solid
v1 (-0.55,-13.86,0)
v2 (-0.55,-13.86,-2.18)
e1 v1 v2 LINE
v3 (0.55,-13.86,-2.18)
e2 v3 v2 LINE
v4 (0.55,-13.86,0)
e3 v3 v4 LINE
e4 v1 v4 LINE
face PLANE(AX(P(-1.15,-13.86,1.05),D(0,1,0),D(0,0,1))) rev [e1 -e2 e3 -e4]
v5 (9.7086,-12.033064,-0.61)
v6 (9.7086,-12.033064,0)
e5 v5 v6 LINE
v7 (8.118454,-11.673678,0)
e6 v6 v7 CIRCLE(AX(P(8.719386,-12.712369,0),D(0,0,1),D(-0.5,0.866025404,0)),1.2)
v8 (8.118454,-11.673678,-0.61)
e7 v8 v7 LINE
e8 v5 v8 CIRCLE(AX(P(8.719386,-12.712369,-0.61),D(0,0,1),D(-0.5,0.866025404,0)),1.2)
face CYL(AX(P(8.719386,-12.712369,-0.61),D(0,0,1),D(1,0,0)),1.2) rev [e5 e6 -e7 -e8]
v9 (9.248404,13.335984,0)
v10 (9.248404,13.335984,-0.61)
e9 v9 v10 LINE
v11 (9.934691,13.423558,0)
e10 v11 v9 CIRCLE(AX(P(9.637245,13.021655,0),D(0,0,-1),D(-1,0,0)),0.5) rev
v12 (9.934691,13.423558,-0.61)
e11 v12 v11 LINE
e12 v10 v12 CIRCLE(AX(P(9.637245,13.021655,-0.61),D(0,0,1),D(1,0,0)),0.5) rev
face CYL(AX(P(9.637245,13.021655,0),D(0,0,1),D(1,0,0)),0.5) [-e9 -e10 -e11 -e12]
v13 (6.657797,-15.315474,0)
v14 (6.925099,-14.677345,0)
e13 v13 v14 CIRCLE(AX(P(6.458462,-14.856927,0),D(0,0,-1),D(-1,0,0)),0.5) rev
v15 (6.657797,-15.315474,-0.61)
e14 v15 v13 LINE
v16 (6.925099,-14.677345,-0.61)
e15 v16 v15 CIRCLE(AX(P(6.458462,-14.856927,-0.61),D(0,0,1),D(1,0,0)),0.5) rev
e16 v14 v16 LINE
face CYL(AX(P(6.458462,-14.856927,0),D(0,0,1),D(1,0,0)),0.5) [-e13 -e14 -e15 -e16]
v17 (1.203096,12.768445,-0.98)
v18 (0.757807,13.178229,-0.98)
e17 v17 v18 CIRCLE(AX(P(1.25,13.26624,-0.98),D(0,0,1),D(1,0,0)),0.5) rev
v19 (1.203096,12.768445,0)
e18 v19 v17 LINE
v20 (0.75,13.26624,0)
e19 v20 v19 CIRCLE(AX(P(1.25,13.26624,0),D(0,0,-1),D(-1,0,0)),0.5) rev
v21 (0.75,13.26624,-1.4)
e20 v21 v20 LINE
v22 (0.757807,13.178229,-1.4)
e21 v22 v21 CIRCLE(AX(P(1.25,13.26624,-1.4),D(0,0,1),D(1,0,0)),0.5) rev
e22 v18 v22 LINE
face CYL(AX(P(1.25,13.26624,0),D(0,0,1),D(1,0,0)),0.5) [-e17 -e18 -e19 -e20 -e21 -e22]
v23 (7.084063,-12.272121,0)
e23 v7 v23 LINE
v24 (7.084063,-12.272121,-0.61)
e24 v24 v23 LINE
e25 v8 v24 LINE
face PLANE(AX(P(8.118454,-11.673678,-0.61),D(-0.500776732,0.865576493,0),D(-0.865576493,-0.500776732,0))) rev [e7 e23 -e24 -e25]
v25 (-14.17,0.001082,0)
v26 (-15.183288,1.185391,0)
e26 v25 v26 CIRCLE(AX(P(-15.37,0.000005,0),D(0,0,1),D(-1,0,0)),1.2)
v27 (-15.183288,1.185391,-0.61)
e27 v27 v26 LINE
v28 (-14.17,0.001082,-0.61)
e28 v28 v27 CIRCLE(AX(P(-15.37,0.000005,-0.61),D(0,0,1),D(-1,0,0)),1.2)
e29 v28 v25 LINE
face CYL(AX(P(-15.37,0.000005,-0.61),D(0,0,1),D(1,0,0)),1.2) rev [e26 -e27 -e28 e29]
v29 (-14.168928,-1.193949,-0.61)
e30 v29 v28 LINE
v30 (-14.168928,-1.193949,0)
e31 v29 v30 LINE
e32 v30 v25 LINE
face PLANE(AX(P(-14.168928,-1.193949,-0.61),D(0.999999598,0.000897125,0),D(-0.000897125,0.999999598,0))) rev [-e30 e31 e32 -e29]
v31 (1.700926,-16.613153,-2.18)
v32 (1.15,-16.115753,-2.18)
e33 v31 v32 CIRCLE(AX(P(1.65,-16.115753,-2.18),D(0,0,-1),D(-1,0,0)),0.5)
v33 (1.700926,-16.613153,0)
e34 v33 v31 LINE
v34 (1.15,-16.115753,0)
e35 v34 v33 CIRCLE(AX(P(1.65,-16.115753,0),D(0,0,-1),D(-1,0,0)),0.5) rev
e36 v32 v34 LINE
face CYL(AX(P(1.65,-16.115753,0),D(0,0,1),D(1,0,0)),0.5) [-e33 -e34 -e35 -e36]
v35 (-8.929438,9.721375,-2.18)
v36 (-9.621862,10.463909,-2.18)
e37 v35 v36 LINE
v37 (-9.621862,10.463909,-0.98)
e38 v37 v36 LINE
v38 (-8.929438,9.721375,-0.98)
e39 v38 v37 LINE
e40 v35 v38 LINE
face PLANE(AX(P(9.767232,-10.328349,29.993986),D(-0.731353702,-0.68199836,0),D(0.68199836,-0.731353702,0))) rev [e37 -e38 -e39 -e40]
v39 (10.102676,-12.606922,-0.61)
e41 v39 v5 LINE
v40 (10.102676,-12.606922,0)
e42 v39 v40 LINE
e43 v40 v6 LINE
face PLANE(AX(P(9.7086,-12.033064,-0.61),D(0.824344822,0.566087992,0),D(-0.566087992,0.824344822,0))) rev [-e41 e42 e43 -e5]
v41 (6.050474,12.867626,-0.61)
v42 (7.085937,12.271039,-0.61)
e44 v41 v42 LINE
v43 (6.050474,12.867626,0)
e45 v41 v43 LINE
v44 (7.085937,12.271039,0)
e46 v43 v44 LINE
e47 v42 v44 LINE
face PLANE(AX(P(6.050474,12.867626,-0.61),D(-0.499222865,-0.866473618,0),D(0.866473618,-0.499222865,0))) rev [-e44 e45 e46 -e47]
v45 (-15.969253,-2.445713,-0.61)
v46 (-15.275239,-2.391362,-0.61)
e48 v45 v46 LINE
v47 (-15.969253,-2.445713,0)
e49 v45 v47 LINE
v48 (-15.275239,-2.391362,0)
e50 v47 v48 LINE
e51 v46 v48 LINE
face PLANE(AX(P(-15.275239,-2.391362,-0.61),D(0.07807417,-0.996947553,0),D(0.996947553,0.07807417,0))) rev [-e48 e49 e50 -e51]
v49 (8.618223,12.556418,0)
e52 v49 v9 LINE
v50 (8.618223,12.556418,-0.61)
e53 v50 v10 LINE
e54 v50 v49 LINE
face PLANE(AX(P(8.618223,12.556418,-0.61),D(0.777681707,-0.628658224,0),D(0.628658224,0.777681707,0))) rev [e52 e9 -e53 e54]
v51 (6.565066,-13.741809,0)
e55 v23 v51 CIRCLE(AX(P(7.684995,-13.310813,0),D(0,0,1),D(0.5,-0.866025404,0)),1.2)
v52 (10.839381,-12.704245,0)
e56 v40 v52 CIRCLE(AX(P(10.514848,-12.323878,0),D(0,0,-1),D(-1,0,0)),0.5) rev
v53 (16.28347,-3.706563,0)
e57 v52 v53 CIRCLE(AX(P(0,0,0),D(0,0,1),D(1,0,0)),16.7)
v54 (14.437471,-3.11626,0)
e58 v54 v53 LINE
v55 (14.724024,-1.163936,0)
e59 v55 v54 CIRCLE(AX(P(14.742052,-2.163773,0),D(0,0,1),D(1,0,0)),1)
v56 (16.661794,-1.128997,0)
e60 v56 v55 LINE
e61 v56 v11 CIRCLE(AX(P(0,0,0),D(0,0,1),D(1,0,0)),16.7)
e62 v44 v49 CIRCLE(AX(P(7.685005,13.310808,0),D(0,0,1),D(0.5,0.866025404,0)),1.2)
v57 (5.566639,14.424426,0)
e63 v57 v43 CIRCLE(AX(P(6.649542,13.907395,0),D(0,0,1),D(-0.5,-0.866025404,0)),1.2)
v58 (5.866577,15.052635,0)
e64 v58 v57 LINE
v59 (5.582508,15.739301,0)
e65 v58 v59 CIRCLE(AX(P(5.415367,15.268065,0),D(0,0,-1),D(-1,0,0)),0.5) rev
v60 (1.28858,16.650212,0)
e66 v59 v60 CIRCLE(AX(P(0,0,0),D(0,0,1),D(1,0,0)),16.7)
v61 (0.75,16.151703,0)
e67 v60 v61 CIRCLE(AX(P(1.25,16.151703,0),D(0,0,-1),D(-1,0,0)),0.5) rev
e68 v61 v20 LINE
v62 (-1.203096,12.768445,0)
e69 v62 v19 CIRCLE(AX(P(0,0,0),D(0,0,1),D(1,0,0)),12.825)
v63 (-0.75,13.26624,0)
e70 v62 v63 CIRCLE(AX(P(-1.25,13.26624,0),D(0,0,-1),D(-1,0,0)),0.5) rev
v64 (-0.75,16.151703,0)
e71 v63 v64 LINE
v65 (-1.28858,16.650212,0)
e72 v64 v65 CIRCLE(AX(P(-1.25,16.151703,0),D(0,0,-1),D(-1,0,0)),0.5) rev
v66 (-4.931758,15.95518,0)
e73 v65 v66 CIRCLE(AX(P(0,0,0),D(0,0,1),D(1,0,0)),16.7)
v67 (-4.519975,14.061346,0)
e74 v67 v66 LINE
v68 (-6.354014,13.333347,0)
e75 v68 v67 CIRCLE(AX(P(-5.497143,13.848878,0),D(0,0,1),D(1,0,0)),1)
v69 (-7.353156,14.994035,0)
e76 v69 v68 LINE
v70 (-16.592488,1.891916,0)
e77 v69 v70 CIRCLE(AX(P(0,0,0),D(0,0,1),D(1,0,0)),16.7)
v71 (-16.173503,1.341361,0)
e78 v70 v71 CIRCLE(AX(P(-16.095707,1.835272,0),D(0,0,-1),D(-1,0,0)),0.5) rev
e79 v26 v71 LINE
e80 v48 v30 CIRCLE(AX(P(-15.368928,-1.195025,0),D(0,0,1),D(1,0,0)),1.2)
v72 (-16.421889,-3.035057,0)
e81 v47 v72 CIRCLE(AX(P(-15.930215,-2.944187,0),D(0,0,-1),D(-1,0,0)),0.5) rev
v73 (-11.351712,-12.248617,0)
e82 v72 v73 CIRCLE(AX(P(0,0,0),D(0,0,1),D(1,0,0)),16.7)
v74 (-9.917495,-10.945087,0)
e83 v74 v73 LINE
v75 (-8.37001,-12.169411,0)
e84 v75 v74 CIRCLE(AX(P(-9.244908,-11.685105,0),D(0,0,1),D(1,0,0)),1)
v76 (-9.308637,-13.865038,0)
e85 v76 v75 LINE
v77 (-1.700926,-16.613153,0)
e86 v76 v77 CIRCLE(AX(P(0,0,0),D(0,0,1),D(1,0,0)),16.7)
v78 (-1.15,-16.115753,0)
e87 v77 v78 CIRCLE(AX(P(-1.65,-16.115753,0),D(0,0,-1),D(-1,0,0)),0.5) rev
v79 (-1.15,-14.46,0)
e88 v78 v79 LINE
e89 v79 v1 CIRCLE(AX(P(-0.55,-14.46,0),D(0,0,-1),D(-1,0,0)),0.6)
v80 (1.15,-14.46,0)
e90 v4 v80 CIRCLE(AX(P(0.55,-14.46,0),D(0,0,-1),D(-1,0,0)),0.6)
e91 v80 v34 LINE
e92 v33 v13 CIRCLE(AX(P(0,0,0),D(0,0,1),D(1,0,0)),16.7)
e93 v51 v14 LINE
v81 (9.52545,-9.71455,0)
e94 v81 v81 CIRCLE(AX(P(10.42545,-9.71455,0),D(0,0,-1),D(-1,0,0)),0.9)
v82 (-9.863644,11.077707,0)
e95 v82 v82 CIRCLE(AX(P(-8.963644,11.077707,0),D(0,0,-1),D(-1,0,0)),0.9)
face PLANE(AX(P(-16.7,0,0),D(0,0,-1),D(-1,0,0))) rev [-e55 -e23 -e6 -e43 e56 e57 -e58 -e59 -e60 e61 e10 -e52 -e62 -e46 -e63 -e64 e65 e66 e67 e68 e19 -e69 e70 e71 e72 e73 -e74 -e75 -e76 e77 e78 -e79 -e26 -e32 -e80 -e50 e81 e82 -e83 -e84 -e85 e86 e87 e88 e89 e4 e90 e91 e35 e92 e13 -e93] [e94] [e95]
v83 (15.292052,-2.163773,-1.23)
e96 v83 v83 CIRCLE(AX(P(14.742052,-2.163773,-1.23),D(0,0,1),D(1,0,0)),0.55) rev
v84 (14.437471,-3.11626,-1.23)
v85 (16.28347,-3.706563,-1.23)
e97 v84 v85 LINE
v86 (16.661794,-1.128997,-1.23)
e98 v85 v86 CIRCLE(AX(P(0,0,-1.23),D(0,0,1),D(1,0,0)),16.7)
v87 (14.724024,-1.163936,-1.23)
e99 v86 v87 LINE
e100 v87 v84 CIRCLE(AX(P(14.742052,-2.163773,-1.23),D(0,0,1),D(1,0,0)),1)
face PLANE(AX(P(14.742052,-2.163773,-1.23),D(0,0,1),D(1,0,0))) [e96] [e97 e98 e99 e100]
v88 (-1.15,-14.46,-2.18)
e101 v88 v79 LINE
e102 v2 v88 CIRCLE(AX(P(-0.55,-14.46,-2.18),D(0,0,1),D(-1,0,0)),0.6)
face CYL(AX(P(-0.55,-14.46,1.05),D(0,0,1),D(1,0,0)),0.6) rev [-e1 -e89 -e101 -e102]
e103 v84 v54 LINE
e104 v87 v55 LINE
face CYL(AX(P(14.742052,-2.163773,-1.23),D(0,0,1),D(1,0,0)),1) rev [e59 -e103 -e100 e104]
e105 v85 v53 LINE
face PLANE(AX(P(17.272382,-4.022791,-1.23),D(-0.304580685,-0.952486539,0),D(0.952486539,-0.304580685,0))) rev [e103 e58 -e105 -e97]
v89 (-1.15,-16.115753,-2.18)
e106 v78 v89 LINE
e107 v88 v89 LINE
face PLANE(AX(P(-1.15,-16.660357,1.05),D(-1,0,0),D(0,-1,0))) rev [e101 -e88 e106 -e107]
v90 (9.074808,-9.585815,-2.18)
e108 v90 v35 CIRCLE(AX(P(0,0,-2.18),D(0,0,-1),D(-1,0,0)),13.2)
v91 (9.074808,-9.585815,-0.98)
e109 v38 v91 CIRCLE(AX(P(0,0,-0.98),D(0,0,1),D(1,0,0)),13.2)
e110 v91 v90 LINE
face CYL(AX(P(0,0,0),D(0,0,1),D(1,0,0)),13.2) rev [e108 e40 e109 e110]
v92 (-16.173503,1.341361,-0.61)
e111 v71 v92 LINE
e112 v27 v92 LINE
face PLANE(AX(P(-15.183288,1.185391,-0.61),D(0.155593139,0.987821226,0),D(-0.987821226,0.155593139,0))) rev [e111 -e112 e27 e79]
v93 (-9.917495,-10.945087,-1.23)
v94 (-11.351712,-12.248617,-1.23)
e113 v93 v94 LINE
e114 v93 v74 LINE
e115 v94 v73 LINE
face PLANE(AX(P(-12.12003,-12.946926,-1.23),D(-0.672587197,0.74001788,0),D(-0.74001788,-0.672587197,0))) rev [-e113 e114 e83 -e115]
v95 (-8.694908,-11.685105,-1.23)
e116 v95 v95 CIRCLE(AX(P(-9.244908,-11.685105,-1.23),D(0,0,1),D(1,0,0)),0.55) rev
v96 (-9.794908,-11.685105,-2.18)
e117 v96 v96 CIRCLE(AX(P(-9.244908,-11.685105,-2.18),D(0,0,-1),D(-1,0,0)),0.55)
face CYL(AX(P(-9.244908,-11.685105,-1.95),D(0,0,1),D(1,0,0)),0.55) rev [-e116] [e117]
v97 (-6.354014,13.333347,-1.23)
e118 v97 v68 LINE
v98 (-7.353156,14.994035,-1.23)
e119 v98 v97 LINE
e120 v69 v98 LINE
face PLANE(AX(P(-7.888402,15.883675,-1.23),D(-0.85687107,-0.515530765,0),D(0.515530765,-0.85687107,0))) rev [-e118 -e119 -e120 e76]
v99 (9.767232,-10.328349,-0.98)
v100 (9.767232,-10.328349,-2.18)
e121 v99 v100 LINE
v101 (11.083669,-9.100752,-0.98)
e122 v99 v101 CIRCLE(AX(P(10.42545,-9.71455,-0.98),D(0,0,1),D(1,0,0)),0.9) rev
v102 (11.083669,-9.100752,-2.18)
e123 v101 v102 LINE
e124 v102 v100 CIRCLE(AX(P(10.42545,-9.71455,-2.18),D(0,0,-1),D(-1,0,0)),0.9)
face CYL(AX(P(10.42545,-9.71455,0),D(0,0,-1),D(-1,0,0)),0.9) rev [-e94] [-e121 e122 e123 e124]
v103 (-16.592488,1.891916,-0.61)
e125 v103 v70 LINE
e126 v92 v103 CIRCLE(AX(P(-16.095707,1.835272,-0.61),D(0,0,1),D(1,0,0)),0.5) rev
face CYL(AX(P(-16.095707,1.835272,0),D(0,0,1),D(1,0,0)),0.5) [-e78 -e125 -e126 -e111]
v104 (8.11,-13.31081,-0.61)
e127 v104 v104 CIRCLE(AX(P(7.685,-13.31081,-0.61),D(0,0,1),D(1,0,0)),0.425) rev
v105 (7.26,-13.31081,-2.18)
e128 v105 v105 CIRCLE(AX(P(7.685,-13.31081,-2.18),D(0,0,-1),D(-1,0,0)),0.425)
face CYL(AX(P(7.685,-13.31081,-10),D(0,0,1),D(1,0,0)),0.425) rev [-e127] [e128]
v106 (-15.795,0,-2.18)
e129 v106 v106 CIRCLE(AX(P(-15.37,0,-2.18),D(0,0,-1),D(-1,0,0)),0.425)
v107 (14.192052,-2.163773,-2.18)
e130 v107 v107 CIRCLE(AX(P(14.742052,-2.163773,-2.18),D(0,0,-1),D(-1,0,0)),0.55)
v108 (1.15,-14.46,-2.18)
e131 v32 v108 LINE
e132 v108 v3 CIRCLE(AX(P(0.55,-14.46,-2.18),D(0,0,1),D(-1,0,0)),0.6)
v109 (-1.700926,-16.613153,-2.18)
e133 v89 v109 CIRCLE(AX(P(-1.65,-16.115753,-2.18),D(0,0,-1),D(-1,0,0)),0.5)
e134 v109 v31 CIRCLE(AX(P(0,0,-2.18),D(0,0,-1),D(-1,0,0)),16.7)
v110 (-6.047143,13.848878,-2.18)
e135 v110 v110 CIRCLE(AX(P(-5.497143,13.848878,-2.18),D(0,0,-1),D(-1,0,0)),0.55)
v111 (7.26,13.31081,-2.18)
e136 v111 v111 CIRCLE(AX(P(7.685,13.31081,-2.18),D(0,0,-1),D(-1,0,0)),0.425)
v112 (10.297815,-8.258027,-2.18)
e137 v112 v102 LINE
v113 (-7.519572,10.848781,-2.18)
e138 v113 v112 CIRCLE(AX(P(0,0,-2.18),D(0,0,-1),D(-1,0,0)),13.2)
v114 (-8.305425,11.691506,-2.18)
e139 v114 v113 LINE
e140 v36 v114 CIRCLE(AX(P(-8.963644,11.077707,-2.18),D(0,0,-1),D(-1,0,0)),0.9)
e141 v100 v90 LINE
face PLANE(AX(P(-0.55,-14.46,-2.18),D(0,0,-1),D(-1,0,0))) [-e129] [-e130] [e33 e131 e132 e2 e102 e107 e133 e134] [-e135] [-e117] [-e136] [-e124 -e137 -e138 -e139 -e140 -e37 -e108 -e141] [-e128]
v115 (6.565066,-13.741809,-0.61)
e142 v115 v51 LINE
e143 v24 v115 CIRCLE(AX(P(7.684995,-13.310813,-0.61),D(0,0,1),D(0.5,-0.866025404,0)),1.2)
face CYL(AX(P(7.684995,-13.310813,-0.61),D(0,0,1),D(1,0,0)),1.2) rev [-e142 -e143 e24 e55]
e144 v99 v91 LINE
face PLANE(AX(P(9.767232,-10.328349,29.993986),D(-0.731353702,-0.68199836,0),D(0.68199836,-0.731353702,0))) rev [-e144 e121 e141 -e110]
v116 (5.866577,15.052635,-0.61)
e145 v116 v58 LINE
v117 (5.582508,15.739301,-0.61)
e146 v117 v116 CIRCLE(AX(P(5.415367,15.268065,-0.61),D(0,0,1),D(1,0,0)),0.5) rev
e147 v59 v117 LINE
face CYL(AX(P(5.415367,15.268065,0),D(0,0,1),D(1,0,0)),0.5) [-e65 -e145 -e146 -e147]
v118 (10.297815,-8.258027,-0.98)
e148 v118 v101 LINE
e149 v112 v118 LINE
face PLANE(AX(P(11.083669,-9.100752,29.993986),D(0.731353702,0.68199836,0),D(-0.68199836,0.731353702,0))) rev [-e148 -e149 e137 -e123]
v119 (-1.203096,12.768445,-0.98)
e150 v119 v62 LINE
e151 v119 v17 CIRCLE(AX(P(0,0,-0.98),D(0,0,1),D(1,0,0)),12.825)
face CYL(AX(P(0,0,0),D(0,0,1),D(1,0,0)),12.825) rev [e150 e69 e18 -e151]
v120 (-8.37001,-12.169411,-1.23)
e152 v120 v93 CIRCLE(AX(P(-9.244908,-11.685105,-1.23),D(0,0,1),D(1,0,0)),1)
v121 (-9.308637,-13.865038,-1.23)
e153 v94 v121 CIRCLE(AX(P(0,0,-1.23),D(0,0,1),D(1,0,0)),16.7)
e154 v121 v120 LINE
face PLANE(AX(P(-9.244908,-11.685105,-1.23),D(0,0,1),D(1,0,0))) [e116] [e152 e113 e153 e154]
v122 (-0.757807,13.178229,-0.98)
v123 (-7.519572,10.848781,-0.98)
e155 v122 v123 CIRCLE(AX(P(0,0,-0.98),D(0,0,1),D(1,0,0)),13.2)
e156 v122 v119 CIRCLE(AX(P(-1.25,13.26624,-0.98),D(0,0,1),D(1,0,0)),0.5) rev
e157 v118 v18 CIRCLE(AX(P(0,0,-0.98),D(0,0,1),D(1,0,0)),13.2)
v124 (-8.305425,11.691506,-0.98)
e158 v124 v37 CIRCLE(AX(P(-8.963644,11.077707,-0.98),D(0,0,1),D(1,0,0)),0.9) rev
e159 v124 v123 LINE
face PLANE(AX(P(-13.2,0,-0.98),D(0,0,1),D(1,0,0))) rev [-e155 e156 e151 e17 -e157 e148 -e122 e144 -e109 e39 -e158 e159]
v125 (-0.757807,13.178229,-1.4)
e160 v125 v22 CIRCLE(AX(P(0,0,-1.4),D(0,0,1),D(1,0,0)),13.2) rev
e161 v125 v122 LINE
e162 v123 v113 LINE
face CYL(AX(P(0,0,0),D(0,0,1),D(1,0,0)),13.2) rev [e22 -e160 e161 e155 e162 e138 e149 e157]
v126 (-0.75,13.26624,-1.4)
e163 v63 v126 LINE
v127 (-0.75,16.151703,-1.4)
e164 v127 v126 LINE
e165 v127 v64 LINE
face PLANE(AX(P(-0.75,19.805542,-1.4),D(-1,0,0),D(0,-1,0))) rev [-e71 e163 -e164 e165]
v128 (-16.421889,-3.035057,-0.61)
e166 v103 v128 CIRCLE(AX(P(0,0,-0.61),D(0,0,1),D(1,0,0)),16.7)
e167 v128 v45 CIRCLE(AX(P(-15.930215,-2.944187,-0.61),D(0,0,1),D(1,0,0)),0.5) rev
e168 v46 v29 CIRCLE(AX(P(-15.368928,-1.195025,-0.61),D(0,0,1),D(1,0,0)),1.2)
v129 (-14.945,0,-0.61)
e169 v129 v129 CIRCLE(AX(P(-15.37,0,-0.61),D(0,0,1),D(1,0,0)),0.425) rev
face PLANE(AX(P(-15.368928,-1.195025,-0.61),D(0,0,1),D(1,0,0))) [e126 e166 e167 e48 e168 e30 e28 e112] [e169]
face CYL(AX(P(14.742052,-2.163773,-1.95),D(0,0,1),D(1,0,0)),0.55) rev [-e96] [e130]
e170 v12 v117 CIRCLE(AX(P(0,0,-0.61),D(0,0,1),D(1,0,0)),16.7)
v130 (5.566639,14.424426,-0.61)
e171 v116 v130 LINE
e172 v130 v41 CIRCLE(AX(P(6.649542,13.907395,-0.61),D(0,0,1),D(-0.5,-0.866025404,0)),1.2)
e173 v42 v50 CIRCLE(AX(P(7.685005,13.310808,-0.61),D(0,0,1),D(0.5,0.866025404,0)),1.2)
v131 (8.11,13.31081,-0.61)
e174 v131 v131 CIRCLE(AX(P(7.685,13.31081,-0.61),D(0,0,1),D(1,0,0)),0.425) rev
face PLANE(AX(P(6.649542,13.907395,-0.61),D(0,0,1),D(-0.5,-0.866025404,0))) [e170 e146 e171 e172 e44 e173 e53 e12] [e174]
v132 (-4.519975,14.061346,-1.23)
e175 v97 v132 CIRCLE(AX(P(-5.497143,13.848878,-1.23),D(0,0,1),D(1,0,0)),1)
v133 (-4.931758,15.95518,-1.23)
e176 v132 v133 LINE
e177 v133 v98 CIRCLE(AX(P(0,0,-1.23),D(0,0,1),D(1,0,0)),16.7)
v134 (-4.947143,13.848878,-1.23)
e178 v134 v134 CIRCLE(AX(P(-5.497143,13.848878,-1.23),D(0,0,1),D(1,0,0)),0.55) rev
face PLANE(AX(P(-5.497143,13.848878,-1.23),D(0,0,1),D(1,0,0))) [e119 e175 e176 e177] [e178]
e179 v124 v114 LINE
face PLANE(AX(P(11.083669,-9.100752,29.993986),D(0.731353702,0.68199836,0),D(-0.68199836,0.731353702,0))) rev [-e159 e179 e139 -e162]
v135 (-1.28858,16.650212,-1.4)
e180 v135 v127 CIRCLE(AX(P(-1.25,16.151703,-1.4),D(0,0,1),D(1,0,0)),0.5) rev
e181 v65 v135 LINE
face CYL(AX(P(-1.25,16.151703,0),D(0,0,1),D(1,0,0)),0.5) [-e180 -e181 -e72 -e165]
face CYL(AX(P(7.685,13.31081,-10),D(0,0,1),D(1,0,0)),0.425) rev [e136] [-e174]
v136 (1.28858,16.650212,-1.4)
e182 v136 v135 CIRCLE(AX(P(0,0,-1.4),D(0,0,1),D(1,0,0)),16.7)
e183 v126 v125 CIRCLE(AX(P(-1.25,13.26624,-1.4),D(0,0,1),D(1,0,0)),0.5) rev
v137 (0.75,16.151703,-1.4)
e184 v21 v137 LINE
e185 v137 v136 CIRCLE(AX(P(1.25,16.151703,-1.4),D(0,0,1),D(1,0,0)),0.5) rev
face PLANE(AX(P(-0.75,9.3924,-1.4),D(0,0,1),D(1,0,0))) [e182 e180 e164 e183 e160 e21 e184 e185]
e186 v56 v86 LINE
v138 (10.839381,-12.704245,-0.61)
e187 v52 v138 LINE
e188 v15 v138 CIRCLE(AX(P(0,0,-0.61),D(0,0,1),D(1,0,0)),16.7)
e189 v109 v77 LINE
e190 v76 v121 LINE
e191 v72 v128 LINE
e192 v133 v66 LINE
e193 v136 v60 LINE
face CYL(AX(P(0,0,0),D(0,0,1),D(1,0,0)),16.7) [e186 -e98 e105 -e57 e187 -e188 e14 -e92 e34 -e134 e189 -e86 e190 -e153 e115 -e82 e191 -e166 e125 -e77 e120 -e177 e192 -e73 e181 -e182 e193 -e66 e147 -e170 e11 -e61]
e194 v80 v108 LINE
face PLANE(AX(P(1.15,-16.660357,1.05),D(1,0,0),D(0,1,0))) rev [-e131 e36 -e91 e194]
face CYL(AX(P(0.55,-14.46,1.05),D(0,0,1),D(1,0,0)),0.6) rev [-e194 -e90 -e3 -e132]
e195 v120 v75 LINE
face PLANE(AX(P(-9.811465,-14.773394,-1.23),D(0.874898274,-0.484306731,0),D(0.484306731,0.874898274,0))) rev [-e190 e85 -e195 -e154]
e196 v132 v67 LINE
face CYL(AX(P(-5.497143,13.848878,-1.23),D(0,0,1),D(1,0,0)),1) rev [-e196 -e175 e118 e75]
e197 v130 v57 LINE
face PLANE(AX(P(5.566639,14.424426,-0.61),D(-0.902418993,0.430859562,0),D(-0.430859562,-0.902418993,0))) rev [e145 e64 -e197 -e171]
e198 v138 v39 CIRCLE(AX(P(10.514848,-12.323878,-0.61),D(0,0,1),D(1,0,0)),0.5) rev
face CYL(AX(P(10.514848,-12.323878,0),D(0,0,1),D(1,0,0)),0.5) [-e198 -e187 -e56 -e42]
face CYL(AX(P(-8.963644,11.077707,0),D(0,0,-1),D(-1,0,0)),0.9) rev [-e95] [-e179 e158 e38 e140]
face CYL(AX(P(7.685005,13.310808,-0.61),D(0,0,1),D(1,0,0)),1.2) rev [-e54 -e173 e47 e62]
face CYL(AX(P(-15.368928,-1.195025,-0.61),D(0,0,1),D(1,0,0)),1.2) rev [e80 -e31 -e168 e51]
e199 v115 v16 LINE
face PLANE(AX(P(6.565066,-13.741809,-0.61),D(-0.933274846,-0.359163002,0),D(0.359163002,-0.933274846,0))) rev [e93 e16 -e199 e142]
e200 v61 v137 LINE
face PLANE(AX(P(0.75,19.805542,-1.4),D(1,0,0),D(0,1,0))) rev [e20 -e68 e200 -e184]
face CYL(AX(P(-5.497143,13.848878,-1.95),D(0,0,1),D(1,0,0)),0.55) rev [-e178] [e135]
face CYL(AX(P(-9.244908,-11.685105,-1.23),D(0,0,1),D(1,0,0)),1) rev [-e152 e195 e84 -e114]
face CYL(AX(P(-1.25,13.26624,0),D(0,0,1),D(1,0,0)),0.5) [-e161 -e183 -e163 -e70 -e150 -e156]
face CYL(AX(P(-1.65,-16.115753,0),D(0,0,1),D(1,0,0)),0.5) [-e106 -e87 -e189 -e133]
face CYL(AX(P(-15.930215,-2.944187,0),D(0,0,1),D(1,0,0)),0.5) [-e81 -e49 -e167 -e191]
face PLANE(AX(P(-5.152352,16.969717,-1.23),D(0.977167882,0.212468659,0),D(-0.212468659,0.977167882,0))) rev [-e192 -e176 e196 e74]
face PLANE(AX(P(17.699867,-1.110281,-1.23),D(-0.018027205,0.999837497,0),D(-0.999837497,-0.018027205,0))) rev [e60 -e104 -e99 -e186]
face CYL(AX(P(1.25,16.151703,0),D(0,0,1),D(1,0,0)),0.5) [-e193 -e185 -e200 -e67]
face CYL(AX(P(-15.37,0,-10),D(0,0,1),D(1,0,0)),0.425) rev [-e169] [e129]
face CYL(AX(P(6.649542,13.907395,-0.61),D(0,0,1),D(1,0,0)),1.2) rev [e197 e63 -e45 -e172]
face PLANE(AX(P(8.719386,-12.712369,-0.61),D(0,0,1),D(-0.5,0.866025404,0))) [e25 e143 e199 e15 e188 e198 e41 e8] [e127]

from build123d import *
from build123d.topology import SkipClean

# Parameters (mm, degrees)
CUT_EXTRUDE_1_DEPTH              = 3
SKETCH_3_R                       = 0.425
CUT_EXTRUDE_2_DEPTH              = 10
CUT_EXTRUDE_3_DEPTH              = 0.61
FILLET_1_R                       = 0.5
PATTERN_CIRCULAR_1_COUNT         = 3
FILLET_1_OF_PATTERN_CIRCULAR_1_R = 0.5
SKETCH_5_W                       = 1.5
SKETCH_5_H                       = 10.413141387
CUT_EXTRUDE_4_DEPTH              = 1.4
FILLET_2_R                       = 0.6
SKETCH_22_R                      = 0.9
CUT_EXTRUDE_14_DEPTH             = 24.697731959
FILLET_3_R                       = 0.5
SKETCH_14_R                      = 0.55
CUT_EXTRUDE_9_DEPTH              = 24.697731959
CUT_EXTRUDE_10_DEPTH             = 1.23
SKETCH_23_R                      = 13.2
SKETCH_23_R_2                    = 0.425
SKETCH_23_R_3                    = 0.9
SKETCH_23_R_4                    = 0.55
EXTRUDE_1_DEPTH                  = 0.23
CUT_EXTRUDE_15_DEPTH             = 1.2


with BuildPart() as part:
    # Эскиз1 → Повернуть1 (revolve)
    with BuildSketch(Plane(origin=(0, 0, 0), x_dir=(1, 0, 0), z_dir=(0, 1, 0)), mode=Mode.PRIVATE) as revolve_1_sk:
        Polygon((-16.7, 0), (-12.825, 0), (-12.825, 0.98), (-13.2, 0.98), (-13.2, 1.95), (-16.7, 1.95), align=None)
    revolve(revolve_1_sk.sketch.rotate(Axis((0, 0, 0), (0, 0, -1)), 180), axis=Axis((0, 0, 0), (0, 0, -1)))

    # Эскиз2 → Вырез-Вытянуть1 (cut)
    with BuildSketch(Plane(origin=(0, 0, -1.95), x_dir=(-1, 0, 0), z_dir=(0, 0, -1))):
        with BuildLine():
            Line((1.15, -16.660357139), (1.15, -13.86))
            Line((1.15, -13.86), (-1.15, -13.86))
            Line((-1.15, -13.86), (-1.15, -16.660357139))
            ThreePointArc((-1.15, -16.660357139), (0, -16.850858655), (1.15, -16.660357139))
        make_face()
    extrude(amount=-CUT_EXTRUDE_1_DEPTH, mode=Mode.SUBTRACT)

    # Эскиз3 → Вырез-Вытянуть2 (cut)
    with BuildSketch(Plane.XY):
        with Locations((-15.37, 0)):
            Circle(SKETCH_3_R)
    cut_extrude_2 = extrude(amount=-CUT_EXTRUDE_2_DEPTH, mode=Mode.SUBTRACT)

    # Эскиз4 → Вырез-Вытянуть3 (cut)
    with BuildSketch(Plane.XY):
        with BuildLine():
            Line((-15.183288241, 1.185390734), (-17.344587168, 1.525820031))
            Line((-17.344587168, 1.525820031), (-17.293113612, -0.525872079))
            Line((-17.293113612, -0.525872079), (-16.759364893, -2.507589098))
            Line((-16.759364893, -2.507589098), (-15.275238911, -2.391362418))
            ThreePointArc((-15.275238911, -2.391362418), (-14.487532806, -2.009361072), (-14.168928398, -1.193948803))
            Line((-14.168928398, -1.193948803), (-14.170000491, 0.001081813))
            ThreePointArc((-14.170000491, 0.001081813), (-14.458194682, 0.780140539), (-15.183288241, 1.185390734))
        make_face()
    cut_extrude_3 = extrude(amount=-CUT_EXTRUDE_3_DEPTH, mode=Mode.SUBTRACT)

    # Скругление1
    fillet_1_edges = [part.edges().sort_by_distance(p)[0] for p in [
        (-16.513575068, -2.488340506, -0.305),
        (-16.639959355, 1.414833093, -0.305),
    ]]
    fillet(fillet_1_edges, radius=FILLET_1_R)

    # Круговой массив1: Вырез-Вытянуть2, Вырез-Вытянуть3 ×3 about axis
    pattern_circular_1_axis = Axis((0, 0, 0), (0, 0, 1))
    add([cut_extrude_2.rotate(pattern_circular_1_axis, i * 360 / PATTERN_CIRCULAR_1_COUNT) for i in range(1, PATTERN_CIRCULAR_1_COUNT)], mode=Mode.SUBTRACT)
    add([cut_extrude_3.rotate(pattern_circular_1_axis, i * 360 / PATTERN_CIRCULAR_1_COUNT) for i in range(1, PATTERN_CIRCULAR_1_COUNT)], mode=Mode.SUBTRACT)

    # Скругление1 of Круговой массив1
    fillet_1_of_pattern_circular_1_edges = [part.edges().sort_by_distance(p)[0] for p in [
        (10.411753626, -13.057005263, -0.305),
        (7.094698277, -15.118044065, -0.305),
        (6.101821442, 15.545345769, -0.305),
        (9.545261078, 13.703210973, -0.305),
    ]]
    fillet(fillet_1_of_pattern_circular_1_edges, radius=FILLET_1_OF_PATTERN_CIRCULAR_1_R)

    # Эскиз5 → Вырез-Вытянуть4 (cut)
    with BuildSketch(Plane.XY):
        with Locations((0, 14.598970831)):
            Rectangle(SKETCH_5_W, SKETCH_5_H)
    extrude(amount=-CUT_EXTRUDE_4_DEPTH, mode=Mode.SUBTRACT)

    # Скругление2
    fillet_2_edges = [part.edges().sort_by_distance(p)[0] for p in [
        (1.15, -13.86, -0.975),
        (-1.15, -13.86, -0.975),
    ]]
    fillet(fillet_2_edges, radius=FILLET_2_R)

    # Эскиз22 → Вырез-Вытянуть14 (cut, through all)
    with BuildSketch(Plane(origin=(0, 0, -1.95), x_dir=(-1, 0, 0), z_dir=(0, 0, -1))):
        with Locations((-10.425450224, -9.714550304)):
            Circle(SKETCH_22_R)
        with Locations((8.963643503, 11.077707125)):
            Circle(SKETCH_22_R)
    extrude(amount=-CUT_EXTRUDE_14_DEPTH, mode=Mode.SUBTRACT)

    # Скругление3
    # the kernel refuses this fillet: 0.5 mm, written as the material it takes off along each edge
    with BuildSketch(Plane(origin=(-0.75, 12.803051394, 1.157971634), x_dir=(0, 1, 0), z_dir=(0, 0, -1))) as fillet_3_piece_1_section:
        with BuildLine():
            CenterArc((0.463188653, -0.5), FILLET_3_R, 90, 84.617246865)
            ThreePointArc((-0.03460647, -0.453095685), (-0.015296317, -0.226701126), (0, 0))
            Line((0, 0), (0.463188653, 0))
        make_face()
    fillet_3_piece_1 = extrude(amount=3.295943267, mode=Mode.PRIVATE)
    fillet_3_piece_1 = split(fillet_3_piece_1, bisect_by=Plane(origin=(-0.752336833, 13.200365704, -1.4), z_dir=(0, 0, 1)), keep=Keep.TOP, mode=Mode.PRIVATE)
    add(fillet_3_piece_1, mode=Mode.SUBTRACT)
    with BuildSketch(Plane(origin=(0.75, 12.803051394, 1.157971634), x_dir=(0.9970959124373047, -0.07615603325291273, 0), z_dir=(0, 0, -1))) as fillet_3_piece_2_section:
        with BuildLine():
            CenterArc((0.463273346, -0.49992153), FILLET_3_R, 91.015105015, 84.617246865)
            Line((-0.03527461, -0.461843513), (0, 0))
            ThreePointArc((0, 0), (0.227207673, -0.002012763), (0.454415347, 0))
        make_face()
    fillet_3_piece_2 = extrude(amount=3.295943267, mode=Mode.PRIVATE)
    fillet_3_piece_2 = split(fillet_3_piece_2, bisect_by=Plane(origin=(0.850744081, 12.897606018, -1.4), z_dir=(0, 0, 1)), keep=Keep.TOP, mode=Mode.PRIVATE)
    add(fillet_3_piece_2, mode=Mode.SUBTRACT)
    with BuildSketch(Plane(origin=(0.75, 16.683150182, -1.4), x_dir=(0.9981351186761567, -0.061043303198095235, 0), z_dir=(0, 0, 1))) as fillet_3_piece_3:
        with BuildLine():
            CenterArc((0.531508869, -0.499934747), FILLET_3_R, 89.074330097, 94.425369323)
            Line((0.03244131, -0.530456399), (0, 0))
            ThreePointArc((0, 0), (0.269793256, 0.002179436), (0.539586512, 0))
        make_face()
    extrude(amount=2.748966279, mode=Mode.SUBTRACT)
    with BuildSketch(Plane(origin=(-0.75, 16.683150182, -1.4), x_dir=(-0.9981351186761567, -0.06104330319809576, 0), z_dir=(0, 0, 1))) as fillet_3_piece_4:
        with BuildLine():
            CenterArc((0.531508869, 0.499934747), FILLET_3_R, 176.500300581, 94.425369323)
            Line((0.03244131, 0.530456399), (0, 0))
            ThreePointArc((0, 0), (0.269793256, -0.002179436), (0.539586512, 0))
        make_face()
    extrude(amount=2.748966279, mode=Mode.SUBTRACT)
    with BuildSketch(Plane(origin=(-1.15, -16.660357139, -3.33236123), x_dir=(-0.9963494237820577, 0.08536876319334569, 0), z_dir=(0, 0, 1))) as fillet_3_piece_5:
        with BuildLine():
            CenterArc((0.54466688, -0.499931476), FILLET_3_R, 89.051412184, 95.845818339)
            Line((0.046492168, -0.542615858), (0, 0))
            ThreePointArc((0, 0), (0.276472246, 0.002288687), (0.552944492, 0))
        make_face()
    extrude(amount=4.71472246, mode=Mode.SUBTRACT)
    with BuildSketch(Plane(origin=(1.15, -16.660357139, -3.33236123), x_dir=(0, 1, 0), z_dir=(0, 0, 1))) as fillet_3_piece_6:
        with BuildLine():
            CenterArc((0.544603976, -0.5), FILLET_3_R, 90, 95.845818339)
            ThreePointArc((0.047204187, -0.550925926), (0.021321762, -0.275658345), (0, 0))
            Line((0, 0), (0.544603976, 0))
        make_face()
    extrude(amount=4.71472246, mode=Mode.SUBTRACT)

    # Эскиз14 → Вырез-Вытянуть9 (cut, through all)
    with BuildSketch(Plane.XY):
        with Locations((-5.497143352, 13.848877751)):
            Circle(SKETCH_14_R)
        with Locations((-9.24490827, -11.685104667)):
            Circle(SKETCH_14_R)
        with Locations((14.742051622, -2.163773084)):
            Circle(SKETCH_14_R)
    extrude(amount=-CUT_EXTRUDE_9_DEPTH, mode=Mode.SUBTRACT)

    # Эскиз15 → Вырез-Вытянуть10 (cut)
    with BuildSketch(Plane.XY):
        with BuildLine():
            Line((-7.888402349, 15.883675138), (-5.15235159, 16.969717163))
            Line((-5.15235159, 16.969717163), (-4.519975471, 14.06134641))
            ThreePointArc((-4.519975471, 14.06134641), (-5.128207557, 12.919422868), (-6.354014422, 13.333346986))
            Line((-6.354014422, 13.333346986), (-7.888402349, 15.883675138))
        make_face()
        with BuildLine():
            Line((17.699867349, -1.110280739), (17.272381953, -4.022791215))
            Line((17.272381953, -4.022791215), (14.437470938, -3.116259623))
            ThreePointArc((14.437470938, -3.116259623), (13.752652185, -2.018553414), (14.724024418, -1.163935587))
            Line((14.724024418, -1.163935587), (17.699867349, -1.110280739))
        make_face()
        with BuildLine():
            Line((-9.811465, -14.773394399), (-12.120030363, -12.946925948))
            Line((-12.120030363, -12.946925948), (-9.917495467, -10.945086787))
            ThreePointArc((-9.917495467, -10.945086787), (-8.624444628, -10.900869454), (-8.370009996, -12.169411398))
            Line((-8.370009996, -12.169411398), (-9.811465, -14.773394399))
        make_face()
    extrude(amount=-CUT_EXTRUDE_10_DEPTH, mode=Mode.SUBTRACT)

    # Эскиз23 → Бобышка-Вытянуть1 (add)
    with SkipClean():  # the faces are left unmerged after this step: merging them gives an invalid solid
        with BuildSketch(Plane(origin=(0, 0, -1.95), x_dir=(-1, 0, 0), z_dir=(0, 0, -1))):
            with BuildLine():
                Line((1.15, -14.46), (1.15, -16.115753163))
                ThreePointArc((1.15, -16.115753163), (1.314935053, -16.486875085), (1.700925926, -16.613152952))
                ThreePointArc((1.700925926, -16.613152952), (0, 16.7), (-1.700925926, -16.613152952))
                ThreePointArc((-1.700925926, -16.613152952), (-1.314935053, -16.486875085), (-1.15, -16.115753163))
                Line((-1.15, -16.115753163), (-1.15, -14.46))
                ThreePointArc((-1.15, -14.46), (-0.974264069, -14.035735931), (-0.55, -13.86))
                Line((-0.55, -13.86), (0.55, -13.86))
                ThreePointArc((0.55, -13.86), (0.974264069, -14.035735931), (1.15, -14.46))
            make_face()
            with Locations(Location((0, 0, 0), (0, 0, 93.291137806))):
                Circle(SKETCH_23_R, mode=Mode.SUBTRACT)
            with Locations(Location((15.37, 0, 0), (0, 0, 180))):
                Circle(SKETCH_23_R_2, mode=Mode.SUBTRACT)
            with Locations(Location((-7.685, -13.310810456, 0), (0, 0, 180))):
                Circle(SKETCH_23_R_2, mode=Mode.SUBTRACT)
            with Locations(Location((-7.685, 13.310810456, 0), (0, 0, 180))):
                Circle(SKETCH_23_R_2, mode=Mode.SUBTRACT)
            with Locations((8.963643503, 11.077707125)):
                Circle(SKETCH_23_R_3, mode=Mode.SUBTRACT)
            with Locations((-10.425450224, -9.714550304)):
                Circle(SKETCH_23_R_3, mode=Mode.SUBTRACT)
            with Locations(Location((-14.742051622, -2.163773084, 0), (0, 0, 180))):
                Circle(SKETCH_23_R_4, mode=Mode.SUBTRACT)
            with Locations(Location((9.24490827, -11.685104667, 0), (0, 0, 180))):
                Circle(SKETCH_23_R_4, mode=Mode.SUBTRACT)
            with Locations(Location((5.497143352, 13.848877751, 0), (0, 0, 180))):
                Circle(SKETCH_23_R_4, mode=Mode.SUBTRACT)
        extrude(amount=EXTRUDE_1_DEPTH)

    # Эскиз24 → Вырез-Вытянуть15 (cut)
    with SkipClean():  # the faces are left unmerged after this step: merging them gives an invalid solid
        with BuildSketch(Plane(origin=(0, 0, -2.18), x_dir=(-1, 0, 0), z_dir=(0, 0, -1))):
            with BuildLine():
                Line((-9.767231893, -10.328348828), (9.621861835, 10.463908601))
                ThreePointArc((9.621861835, 10.463908601), (9.577442027, 11.735925456), (8.305425172, 11.691505649))
                Line((8.305425172, 11.691505649), (-11.083668556, -9.10075178))
                ThreePointArc((-11.083668556, -9.10075178), (-11.039248749, -10.372768636), (-9.767231893, -10.328348828))
            make_face()
        extrude(amount=-CUT_EXTRUDE_15_DEPTH, mode=Mode.SUBTRACT)


solid = part.part
